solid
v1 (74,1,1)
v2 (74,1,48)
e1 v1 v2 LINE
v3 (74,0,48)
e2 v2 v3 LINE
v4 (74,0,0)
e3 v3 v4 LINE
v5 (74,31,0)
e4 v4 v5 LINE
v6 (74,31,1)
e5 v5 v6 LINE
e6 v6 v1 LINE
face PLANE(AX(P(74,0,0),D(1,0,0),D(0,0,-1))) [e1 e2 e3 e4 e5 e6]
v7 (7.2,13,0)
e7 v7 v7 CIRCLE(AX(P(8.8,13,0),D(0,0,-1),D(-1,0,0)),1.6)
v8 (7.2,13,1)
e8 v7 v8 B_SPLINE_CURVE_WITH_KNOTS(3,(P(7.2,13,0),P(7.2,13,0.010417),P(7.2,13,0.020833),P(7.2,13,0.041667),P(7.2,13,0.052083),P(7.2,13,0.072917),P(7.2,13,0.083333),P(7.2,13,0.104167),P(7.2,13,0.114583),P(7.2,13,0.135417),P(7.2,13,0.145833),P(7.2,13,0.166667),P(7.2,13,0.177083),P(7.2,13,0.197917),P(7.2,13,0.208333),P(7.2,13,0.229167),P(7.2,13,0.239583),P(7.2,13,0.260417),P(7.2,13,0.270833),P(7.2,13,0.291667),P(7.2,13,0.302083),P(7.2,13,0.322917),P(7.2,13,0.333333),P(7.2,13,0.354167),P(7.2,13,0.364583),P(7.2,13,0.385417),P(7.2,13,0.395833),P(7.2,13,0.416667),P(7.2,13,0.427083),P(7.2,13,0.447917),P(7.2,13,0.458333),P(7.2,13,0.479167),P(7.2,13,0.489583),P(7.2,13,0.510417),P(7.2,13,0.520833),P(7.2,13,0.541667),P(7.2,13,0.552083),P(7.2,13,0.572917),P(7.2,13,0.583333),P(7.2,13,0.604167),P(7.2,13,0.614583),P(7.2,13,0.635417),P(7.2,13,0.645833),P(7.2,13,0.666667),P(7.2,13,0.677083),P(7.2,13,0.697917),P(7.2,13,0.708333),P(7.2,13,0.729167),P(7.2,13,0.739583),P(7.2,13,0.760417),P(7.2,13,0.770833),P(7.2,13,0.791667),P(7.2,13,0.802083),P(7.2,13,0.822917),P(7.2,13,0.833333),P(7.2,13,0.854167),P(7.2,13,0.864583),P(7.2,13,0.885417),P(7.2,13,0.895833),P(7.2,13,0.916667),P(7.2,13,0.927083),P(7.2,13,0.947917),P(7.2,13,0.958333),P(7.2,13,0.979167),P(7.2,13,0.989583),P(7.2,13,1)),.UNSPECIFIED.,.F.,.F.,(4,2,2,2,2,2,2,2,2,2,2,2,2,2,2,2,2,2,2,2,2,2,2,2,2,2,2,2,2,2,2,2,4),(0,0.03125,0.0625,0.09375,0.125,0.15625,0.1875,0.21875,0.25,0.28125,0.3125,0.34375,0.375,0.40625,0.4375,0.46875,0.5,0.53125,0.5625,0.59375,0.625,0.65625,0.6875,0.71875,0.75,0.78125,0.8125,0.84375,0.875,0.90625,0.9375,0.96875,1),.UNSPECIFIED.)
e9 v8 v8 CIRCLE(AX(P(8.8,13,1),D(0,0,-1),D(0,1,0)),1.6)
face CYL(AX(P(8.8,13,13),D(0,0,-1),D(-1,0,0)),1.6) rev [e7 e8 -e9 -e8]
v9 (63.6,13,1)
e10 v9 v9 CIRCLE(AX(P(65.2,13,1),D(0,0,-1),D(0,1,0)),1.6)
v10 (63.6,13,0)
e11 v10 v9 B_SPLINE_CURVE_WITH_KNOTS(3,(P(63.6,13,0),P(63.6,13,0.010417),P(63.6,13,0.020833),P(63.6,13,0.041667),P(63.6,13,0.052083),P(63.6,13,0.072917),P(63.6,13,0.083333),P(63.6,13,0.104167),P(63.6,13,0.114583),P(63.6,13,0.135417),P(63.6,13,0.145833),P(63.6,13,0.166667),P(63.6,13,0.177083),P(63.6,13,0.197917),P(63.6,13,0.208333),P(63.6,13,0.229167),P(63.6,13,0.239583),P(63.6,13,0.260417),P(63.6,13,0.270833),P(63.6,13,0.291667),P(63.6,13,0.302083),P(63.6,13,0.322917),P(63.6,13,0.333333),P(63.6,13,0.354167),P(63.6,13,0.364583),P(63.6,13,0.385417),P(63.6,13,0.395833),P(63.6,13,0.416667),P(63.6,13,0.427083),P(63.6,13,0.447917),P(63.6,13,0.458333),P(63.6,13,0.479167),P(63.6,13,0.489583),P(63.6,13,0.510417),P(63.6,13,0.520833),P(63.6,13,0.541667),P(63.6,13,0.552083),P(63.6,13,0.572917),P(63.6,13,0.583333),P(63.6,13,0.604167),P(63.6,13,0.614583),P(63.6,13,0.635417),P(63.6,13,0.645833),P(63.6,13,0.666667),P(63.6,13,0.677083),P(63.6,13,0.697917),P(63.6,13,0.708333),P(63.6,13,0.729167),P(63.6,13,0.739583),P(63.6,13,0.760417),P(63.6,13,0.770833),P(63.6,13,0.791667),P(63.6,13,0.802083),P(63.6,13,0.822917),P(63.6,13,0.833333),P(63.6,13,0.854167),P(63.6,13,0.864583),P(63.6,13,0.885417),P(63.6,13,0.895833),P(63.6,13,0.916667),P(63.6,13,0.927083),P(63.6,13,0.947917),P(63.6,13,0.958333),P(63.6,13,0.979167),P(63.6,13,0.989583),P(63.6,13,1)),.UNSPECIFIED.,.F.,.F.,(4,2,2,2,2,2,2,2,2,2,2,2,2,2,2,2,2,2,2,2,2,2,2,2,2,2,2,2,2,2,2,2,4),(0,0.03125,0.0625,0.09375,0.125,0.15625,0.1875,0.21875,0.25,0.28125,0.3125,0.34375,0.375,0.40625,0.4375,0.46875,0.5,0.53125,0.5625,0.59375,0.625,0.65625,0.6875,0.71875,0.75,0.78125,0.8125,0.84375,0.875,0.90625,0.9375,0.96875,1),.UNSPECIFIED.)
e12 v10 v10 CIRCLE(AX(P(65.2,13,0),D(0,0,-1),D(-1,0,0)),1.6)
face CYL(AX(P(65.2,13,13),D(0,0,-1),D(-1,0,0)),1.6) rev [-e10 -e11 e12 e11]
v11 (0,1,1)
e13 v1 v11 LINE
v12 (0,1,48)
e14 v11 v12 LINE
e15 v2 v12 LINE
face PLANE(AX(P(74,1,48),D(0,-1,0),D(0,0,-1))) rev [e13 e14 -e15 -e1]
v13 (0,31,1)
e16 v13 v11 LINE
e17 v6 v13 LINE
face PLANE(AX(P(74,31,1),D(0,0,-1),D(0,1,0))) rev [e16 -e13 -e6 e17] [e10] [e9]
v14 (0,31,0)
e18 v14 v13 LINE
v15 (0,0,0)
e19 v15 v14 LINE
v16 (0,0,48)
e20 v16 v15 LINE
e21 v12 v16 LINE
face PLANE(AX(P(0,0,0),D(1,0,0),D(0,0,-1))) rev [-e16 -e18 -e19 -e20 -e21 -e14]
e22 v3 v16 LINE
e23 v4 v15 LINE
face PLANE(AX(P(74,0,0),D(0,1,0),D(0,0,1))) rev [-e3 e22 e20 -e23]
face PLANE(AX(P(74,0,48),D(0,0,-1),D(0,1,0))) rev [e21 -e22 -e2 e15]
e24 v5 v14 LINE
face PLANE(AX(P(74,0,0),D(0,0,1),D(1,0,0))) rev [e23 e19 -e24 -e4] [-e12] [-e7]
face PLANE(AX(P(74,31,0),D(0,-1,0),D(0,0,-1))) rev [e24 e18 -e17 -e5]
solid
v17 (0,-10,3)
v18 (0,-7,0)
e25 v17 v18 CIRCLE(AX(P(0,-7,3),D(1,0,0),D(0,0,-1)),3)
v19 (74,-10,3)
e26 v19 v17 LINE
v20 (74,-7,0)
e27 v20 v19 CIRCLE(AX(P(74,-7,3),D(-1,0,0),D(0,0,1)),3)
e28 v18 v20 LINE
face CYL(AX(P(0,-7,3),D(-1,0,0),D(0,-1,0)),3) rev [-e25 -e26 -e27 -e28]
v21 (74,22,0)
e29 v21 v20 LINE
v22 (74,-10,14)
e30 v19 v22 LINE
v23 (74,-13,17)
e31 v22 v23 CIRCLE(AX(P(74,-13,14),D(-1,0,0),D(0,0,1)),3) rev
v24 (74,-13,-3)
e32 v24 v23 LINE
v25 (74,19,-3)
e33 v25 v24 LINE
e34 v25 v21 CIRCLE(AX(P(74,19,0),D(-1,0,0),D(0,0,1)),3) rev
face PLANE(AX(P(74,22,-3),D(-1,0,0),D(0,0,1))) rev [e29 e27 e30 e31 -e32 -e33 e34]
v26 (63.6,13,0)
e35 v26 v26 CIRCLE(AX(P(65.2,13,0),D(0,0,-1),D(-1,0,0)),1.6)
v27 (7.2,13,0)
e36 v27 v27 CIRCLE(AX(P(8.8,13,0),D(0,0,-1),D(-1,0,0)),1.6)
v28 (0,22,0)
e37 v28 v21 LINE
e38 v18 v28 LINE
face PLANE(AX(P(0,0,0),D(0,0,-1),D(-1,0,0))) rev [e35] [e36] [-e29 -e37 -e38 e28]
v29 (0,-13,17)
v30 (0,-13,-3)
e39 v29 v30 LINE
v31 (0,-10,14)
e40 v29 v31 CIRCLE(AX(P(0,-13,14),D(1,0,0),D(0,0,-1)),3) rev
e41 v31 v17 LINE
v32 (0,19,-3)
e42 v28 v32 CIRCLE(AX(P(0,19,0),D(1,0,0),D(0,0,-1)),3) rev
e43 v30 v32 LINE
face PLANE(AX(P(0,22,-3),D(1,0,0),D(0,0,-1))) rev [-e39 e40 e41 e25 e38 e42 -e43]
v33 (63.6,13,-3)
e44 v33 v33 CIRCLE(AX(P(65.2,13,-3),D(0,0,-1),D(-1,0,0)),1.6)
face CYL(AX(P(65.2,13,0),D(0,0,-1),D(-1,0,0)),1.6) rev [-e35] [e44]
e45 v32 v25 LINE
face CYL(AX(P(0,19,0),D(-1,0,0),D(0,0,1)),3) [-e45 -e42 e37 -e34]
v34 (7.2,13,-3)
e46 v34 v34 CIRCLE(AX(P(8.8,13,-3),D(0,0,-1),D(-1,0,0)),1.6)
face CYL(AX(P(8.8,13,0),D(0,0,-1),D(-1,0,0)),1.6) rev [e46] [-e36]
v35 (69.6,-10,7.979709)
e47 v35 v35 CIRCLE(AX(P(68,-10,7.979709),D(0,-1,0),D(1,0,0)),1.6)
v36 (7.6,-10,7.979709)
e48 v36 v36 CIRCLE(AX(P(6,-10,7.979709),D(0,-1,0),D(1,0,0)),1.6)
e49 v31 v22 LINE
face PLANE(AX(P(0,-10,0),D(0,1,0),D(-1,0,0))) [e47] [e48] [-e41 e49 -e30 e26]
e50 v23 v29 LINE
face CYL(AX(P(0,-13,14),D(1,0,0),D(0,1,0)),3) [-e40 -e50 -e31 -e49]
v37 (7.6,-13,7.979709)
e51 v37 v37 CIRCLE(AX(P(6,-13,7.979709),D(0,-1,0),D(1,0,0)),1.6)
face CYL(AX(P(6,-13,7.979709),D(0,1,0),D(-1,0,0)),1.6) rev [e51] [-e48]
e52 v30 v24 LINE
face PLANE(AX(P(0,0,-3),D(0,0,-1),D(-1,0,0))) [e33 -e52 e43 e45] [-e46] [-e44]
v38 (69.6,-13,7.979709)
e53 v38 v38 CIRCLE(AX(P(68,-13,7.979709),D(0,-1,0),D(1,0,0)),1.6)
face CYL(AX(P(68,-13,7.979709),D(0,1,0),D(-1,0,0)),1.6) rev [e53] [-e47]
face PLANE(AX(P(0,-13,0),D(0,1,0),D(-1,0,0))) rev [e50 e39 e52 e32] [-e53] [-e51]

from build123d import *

# Parameters (mm, degrees)
EXTRUDE_1_DEPTH     = 74
SKETCH_2_R          = 1.6
CUT_EXTRUDE_1_DEPTH = 13
SKETCH2_W           = 74
SKETCH2_H           = 32
BOSS_EXTRUDE1_DEPTH = 3
SKETCH3_W           = 74
SKETCH3_H           = 20
SKETCH3_R           = 1.6
BOSS_EXTRUDE2_DEPTH = 3
SKETCH5_R           = 1.6
CUT_EXTRUDE1_DEPTH  = 3
FILLET3_R           = 3
FILLET5_R           = 3
FILLET6_R           = 3


with BuildPart() as part:
    # Эскиз1 → Бобышка-Вытянуть1 (new body)
    with BuildSketch(Plane(origin=(0, 0, 0), x_dir=(0, 0, -1), z_dir=(1, 0, 0))):
        Polygon((0, 0), (-48, 0), (-48, 1), (-1, 1), (-1, 31), (0, 31), align=None)
    extrude(amount=EXTRUDE_1_DEPTH)

    # Эскиз2 → Вырез-Вытянуть1 (cut)
    with BuildSketch(Plane(origin=(0, 0, 0), x_dir=(-1, 0, 0), z_dir=(0, 0, -1))):
        with Locations((-65.2, 13)):
            Circle(SKETCH_2_R)
        with Locations((-8.8, 13)):
            Circle(SKETCH_2_R)
    extrude(amount=-CUT_EXTRUDE_1_DEPTH, mode=Mode.SUBTRACT)


with BuildPart() as body_2:
    # Sketch2 → Boss-Extrude1 (new body)
    with BuildSketch(Plane(origin=(0, 0, 0), x_dir=(-1, 0, 0), z_dir=(0, 0, -1))):
        with Locations((-37, 6)):
            Rectangle(SKETCH2_W, SKETCH2_H)
    extrude(amount=BOSS_EXTRUDE1_DEPTH)

    # Sketch3 → Boss-Extrude2 (add)
    with BuildSketch(Plane.XZ.offset(10)):
        with Locations((37, 7)):
            Rectangle(SKETCH3_W, SKETCH3_H)
        with Locations((6, 7.979709157)):
            Circle(SKETCH3_R, mode=Mode.SUBTRACT)
        with Locations((68, 7.979709157)):
            Circle(SKETCH3_R, mode=Mode.SUBTRACT)
    extrude(amount=BOSS_EXTRUDE2_DEPTH)

    # Sketch5 → Cut-Extrude1 (cut)
    with BuildSketch(Plane(origin=(0, 0, -3), x_dir=(-1, 0, 0), z_dir=(0, 0, -1))):
        with Locations((-65.2, 13)):
            Circle(SKETCH5_R)
        with Locations((-8.8, 13)):
            Circle(SKETCH5_R)
    extrude(amount=-CUT_EXTRUDE1_DEPTH, mode=Mode.SUBTRACT)

    # Fillet3
    fillet3_edges = [body_2.edges().sort_by_distance(p)[0] for p in [
        (37, 22, -3),
    ]]
    fillet(fillet3_edges, radius=FILLET3_R - 0.0001)  # a hair under: the kernel refuses the full size

    # Fillet5
    fillet5_edges = [body_2.edges().sort_by_distance(p)[0] for p in [
        (37, -10, 17),
    ]]
    fillet(fillet5_edges, radius=FILLET5_R - 0.0001)  # a hair under: the kernel refuses the full size

    # Fillet6
    fillet6_edges = [body_2.edges().sort_by_distance(p)[0] for p in [
        (37, -10, 0),
    ]]
    fillet(fillet6_edges, radius=FILLET6_R)


solid = Compound([part.part, body_2.part])
